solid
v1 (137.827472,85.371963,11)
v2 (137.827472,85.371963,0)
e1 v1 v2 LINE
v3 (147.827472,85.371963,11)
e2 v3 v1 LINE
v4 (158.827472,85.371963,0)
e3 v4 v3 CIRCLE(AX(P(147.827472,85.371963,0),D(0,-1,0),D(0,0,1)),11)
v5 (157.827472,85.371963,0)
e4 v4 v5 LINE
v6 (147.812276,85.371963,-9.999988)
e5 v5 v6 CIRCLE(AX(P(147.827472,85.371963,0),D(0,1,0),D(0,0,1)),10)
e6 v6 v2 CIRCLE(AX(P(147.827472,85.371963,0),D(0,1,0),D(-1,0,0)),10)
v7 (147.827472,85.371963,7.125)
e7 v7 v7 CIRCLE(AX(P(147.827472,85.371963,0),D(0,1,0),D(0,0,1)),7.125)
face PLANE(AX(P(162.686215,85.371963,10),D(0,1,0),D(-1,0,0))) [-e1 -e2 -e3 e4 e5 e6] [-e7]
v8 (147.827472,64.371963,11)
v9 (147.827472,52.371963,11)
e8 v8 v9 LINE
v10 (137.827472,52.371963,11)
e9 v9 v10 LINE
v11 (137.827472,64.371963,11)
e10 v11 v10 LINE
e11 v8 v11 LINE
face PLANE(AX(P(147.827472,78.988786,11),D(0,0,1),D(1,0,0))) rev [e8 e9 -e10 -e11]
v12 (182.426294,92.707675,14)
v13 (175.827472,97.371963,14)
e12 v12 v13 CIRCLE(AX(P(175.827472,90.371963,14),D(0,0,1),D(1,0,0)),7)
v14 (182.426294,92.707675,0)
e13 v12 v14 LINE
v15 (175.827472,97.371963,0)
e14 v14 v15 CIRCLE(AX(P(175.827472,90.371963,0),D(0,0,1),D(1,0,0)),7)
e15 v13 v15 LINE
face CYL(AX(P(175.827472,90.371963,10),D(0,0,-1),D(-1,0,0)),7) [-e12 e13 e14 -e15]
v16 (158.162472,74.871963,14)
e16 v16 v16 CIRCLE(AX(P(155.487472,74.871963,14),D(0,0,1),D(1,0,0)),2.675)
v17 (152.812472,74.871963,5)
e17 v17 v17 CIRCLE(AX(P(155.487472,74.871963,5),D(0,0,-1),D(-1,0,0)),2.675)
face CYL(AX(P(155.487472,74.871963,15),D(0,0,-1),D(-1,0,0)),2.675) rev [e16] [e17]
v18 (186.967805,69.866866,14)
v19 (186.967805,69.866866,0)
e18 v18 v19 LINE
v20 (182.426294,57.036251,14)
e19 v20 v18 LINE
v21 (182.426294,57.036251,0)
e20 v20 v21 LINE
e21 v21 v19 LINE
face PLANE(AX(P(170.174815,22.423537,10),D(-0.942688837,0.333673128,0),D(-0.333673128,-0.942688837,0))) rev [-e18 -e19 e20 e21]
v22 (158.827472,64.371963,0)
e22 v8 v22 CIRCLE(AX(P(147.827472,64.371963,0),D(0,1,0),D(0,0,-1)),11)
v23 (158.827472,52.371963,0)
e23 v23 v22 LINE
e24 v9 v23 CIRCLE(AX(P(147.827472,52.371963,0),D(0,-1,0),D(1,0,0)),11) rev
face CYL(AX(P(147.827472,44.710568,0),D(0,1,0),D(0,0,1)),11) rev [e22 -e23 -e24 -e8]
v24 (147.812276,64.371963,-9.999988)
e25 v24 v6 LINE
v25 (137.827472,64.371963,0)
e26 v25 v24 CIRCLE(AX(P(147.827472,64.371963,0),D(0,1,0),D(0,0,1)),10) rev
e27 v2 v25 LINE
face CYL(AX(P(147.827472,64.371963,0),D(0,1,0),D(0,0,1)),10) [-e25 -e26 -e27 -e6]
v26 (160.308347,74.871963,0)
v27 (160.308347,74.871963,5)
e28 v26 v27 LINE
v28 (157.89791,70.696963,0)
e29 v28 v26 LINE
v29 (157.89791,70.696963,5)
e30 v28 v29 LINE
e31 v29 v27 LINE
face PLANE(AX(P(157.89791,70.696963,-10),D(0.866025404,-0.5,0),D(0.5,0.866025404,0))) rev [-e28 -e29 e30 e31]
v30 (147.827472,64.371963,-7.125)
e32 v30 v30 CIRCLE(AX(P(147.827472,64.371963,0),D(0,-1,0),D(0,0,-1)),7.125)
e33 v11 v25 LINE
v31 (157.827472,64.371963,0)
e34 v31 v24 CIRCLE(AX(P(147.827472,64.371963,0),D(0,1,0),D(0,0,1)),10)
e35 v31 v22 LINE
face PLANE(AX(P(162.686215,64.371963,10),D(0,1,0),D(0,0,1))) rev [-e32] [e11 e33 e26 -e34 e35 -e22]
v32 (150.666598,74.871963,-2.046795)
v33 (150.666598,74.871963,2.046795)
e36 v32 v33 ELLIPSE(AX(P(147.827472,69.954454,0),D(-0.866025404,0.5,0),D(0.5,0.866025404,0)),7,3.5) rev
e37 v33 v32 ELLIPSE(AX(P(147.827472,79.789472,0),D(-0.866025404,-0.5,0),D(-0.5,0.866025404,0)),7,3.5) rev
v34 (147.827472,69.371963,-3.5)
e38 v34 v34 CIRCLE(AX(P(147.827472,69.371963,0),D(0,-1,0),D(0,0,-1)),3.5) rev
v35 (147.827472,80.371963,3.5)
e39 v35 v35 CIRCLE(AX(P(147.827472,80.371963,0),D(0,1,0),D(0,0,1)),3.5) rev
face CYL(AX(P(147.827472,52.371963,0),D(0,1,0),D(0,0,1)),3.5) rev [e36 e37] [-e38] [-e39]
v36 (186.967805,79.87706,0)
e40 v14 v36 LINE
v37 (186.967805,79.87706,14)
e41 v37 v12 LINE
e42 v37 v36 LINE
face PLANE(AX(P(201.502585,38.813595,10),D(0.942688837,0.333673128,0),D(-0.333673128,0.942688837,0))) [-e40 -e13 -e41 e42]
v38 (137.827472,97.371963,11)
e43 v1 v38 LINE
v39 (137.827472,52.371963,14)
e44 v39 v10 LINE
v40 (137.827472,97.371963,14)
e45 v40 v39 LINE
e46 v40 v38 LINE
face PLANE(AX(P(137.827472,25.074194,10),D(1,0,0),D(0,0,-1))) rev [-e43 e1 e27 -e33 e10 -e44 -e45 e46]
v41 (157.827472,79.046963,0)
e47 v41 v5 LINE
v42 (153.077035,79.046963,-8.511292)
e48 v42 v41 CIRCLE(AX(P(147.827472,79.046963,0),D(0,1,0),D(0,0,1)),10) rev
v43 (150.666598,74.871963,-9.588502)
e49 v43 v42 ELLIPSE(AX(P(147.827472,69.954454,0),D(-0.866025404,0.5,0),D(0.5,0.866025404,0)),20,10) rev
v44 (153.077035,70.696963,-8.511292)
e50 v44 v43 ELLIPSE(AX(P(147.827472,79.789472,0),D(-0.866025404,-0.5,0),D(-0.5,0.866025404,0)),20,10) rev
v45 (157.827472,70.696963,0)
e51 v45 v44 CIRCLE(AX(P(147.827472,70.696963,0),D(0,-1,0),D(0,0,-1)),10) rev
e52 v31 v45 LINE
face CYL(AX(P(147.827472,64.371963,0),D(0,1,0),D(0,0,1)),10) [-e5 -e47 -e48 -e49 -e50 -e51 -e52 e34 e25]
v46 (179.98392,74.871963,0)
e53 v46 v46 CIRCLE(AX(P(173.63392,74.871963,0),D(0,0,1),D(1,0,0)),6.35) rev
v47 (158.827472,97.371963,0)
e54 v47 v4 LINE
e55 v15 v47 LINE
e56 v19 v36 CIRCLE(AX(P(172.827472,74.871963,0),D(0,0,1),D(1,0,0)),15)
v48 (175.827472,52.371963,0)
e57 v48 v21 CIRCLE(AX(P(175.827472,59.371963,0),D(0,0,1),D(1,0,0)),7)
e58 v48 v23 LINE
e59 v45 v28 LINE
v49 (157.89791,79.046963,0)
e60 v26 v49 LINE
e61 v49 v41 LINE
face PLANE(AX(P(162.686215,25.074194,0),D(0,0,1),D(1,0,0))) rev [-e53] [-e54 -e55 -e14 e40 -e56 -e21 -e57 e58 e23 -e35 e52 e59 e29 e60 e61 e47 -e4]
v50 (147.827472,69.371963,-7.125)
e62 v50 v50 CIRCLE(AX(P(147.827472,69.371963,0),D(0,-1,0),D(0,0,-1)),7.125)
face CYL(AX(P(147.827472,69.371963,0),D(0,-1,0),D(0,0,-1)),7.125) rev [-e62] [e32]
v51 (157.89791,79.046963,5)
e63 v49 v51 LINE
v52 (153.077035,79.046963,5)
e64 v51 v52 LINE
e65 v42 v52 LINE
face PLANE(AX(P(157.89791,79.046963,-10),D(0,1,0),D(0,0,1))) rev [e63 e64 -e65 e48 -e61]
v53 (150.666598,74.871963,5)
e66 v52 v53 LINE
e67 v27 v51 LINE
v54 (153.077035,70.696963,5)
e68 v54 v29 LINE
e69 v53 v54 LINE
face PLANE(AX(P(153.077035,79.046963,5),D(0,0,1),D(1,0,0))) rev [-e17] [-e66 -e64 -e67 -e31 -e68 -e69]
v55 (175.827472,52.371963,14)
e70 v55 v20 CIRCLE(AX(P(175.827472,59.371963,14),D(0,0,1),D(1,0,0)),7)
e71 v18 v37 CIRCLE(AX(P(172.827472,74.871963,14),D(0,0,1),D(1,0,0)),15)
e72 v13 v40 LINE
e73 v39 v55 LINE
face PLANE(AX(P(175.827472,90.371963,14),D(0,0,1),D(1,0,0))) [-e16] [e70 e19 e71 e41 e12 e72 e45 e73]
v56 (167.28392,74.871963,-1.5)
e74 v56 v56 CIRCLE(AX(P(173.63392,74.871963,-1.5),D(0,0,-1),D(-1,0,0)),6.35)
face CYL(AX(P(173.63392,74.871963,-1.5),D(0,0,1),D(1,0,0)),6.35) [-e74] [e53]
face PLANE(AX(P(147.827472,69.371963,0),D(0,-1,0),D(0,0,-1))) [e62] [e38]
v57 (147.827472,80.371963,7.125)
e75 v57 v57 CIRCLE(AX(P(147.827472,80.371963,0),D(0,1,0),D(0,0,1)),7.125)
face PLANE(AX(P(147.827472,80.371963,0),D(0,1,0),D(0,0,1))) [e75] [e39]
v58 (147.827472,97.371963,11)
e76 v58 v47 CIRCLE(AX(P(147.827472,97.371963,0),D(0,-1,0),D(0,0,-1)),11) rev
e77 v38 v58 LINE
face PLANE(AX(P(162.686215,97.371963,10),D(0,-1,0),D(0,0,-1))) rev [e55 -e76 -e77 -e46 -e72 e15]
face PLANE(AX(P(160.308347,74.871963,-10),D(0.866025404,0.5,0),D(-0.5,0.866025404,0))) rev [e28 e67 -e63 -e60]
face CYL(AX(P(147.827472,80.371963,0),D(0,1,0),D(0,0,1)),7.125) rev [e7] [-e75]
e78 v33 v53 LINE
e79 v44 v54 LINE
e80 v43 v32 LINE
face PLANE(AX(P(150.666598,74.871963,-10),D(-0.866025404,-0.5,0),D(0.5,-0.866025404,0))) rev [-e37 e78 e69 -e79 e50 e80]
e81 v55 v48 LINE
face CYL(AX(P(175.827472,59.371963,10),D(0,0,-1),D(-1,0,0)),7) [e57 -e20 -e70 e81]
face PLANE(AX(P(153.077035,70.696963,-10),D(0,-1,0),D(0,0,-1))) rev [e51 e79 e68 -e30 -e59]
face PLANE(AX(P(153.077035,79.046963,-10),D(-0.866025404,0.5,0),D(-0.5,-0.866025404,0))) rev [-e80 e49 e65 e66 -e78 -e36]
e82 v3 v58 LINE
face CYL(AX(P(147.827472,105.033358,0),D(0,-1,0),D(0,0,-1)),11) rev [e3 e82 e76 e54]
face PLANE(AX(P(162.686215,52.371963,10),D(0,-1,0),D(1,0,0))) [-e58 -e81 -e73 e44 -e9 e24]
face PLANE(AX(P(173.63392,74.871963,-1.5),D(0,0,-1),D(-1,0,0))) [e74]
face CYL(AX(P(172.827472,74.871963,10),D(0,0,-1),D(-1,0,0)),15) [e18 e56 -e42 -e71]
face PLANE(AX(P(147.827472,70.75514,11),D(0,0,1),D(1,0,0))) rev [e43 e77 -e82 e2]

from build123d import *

# Parameters (mm, degrees)
SKETCH1_R            = 2.675
BOSS_EXTRUDE6_DEPTH  = 10
BOSS_EXTRUDE8_START  = -21
BOSS_EXTRUDE8_DEPTH  = 21
SKETCH10_R           = 3.5
CUT_EXTRUDE5_DEPTH   = 191.966382811
SKETCH11_R           = 7.125
CUT_EXTRUDE6_DEPTH   = 5
CUT_EXTRUDE7_START   = -5
SKETCH12_R           = 7.125
CUT_EXTRUDE7_DEPTH   = 5
BOSS_EXTRUDE9_DEPTH  = 5
BOSS_EXTRUDE11_DEPTH = 12
BOSS_EXTRUDE13_START = 12
BOSS_EXTRUDE13_DEPTH = 12
SKETCH18_R           = 6.75
CUT_EXTRUDE11_DEPTH  = 1.67
CUT_EXTRUDE13_DEPTH  = 191.966382811
CUT_EXTRUDE14_DEPTH  = 191.966382811
CUT_EXTRUDE10_DEPTH  = 213.509902322
SKETCH26_R           = 2.675
BOSS_EXTRUDE14_DEPTH = 5
SKETCH27_R           = 2.675
BOSS_EXTRUDE15_DEPTH = 5
SKETCH30_R           = 2.675
CUT_EXTRUDE15_DEPTH  = 10
BOSS_EXTRUDE16_START = 1.67
SKETCH31_R           = 6.75
BOSS_EXTRUDE16_DEPTH = 1.67
SKETCH32_R           = 6.75
BOSS_EXTRUDE17_DEPTH = 2
SKETCH34_R           = 6.35
BOSS_EXTRUDE18_DEPTH = 1.5
SKETCH35_R           = 2.675
BOSS_EXTRUDE19_DEPTH = 4
CUT_EXTRUDE16_DEPTH  = 12
CUT_EXTRUDE17_DEPTH  = 12
FILLET1_R            = 10


with BuildPart() as part:
    # Sketch1 → Boss-Extrude6 (new body)
    with BuildSketch(Plane.XY):
        with BuildLine():
            Line((182.426294195, 92.707675116), (186.967804891, 79.877060143))
            ThreePointArc((186.967804891, 79.877060143), (187.827472336, 74.871963218), (186.967804891, 69.866866293))
            Line((186.967804891, 69.866866293), (182.426294195, 57.03625132))
            ThreePointArc((182.426294195, 57.03625132), (179.86789414, 53.655758914), (175.827472336, 52.371963218))
            Line((175.827472336, 52.371963218), (157.827472336, 52.371963218))
            Line((157.827472336, 52.371963218), (157.827472336, 64.371963218))
            Line((157.827472336, 64.371963218), (137.827472336, 64.371963218))
            Line((137.827472336, 64.371963218), (137.827472336, 85.371963218))
            Line((137.827472336, 85.371963218), (157.827472336, 85.371963218))
            Line((157.827472336, 85.371963218), (157.827472336, 97.371963218))
            Line((157.827472336, 97.371963218), (175.827472336, 97.371963218))
            ThreePointArc((175.827472336, 97.371963218), (179.86789414, 96.088167522), (182.426294195, 92.707675116))
        make_face()
        with Locations((155.487472336, 74.871963218)):
            Circle(SKETCH1_R, mode=Mode.SUBTRACT)
    extrude(amount=BOSS_EXTRUDE6_DEPTH)

    # Sketch9 → Boss-Extrude8 (add)
    with BuildSketch(Plane(origin=(0, 85.371963218, 0), x_dir=(1, 0, 0), z_dir=(0, 1, 0)).offset(BOSS_EXTRUDE8_START)):
        with BuildLine():
            Line((137.827472336, 0), (157.827472336, 0))
            ThreePointArc((157.827472336, 0), (154.893165251, 7.076438626), (147.81227561, 9.999988453))
            Line((147.81227561, 9.999988453), (137.827472336, 9.999988453))
            Line((137.827472336, 9.999988453), (137.827472336, 0))
        make_face()
    extrude(amount=BOSS_EXTRUDE8_DEPTH)

    # Sketch10 → Cut-Extrude5 (cut, through all)
    with BuildSketch(Plane(origin=(0, 85.371963218, 0), x_dir=(1, 0, 0), z_dir=(0, 1, 0))):
        with Locations(Location((147.827472336, 0, 0), (0, 0, 270))):
            Circle(SKETCH10_R)
    extrude(amount=-CUT_EXTRUDE5_DEPTH, mode=Mode.SUBTRACT)

    # Sketch11 → Cut-Extrude6 (cut)
    with BuildSketch(Plane(origin=(0, 85.371963218, 0), x_dir=(1, 0, 0), z_dir=(0, 1, 0))):
        with Locations(Location((147.827472336, 0, 0), (0, 0, 270))):
            Circle(SKETCH11_R)
    extrude(amount=-CUT_EXTRUDE6_DEPTH, mode=Mode.SUBTRACT)

    # Sketch12 → Cut-Extrude7 (cut)
    with BuildSketch(Plane.XZ.offset(-64.371963218).offset(CUT_EXTRUDE7_START)):
        with Locations(Location((147.827472336, 0, 0), (0, 0, 90))):
            Circle(SKETCH12_R)
    extrude(amount=CUT_EXTRUDE7_DEPTH, mode=Mode.SUBTRACT)

    # Sketch15 → Boss-Extrude9 (add)
    with BuildSketch(Plane.XY.offset(10)):
        Polygon((157.89790971, 79.046963218), (153.077034962, 79.046963218), (150.666597588, 74.871963218), (153.077034962, 70.696963218), (157.89790971, 70.696963218), (160.308347084, 74.871963218), align=None)
    extrude(amount=-BOSS_EXTRUDE9_DEPTH)

    # Sketch19 → Boss-Extrude11 (add)
    with BuildSketch(Plane(origin=(0, 85.371963218, 0), x_dir=(1, 0, 0), z_dir=(0, 1, 0))):
        with BuildLine():
            Line((157.827472336, -4.582575695), (157.827472336, -10))
            Line((157.827472336, -10), (152.410048031, -10))
            ThreePointArc((152.410048031, -10), (155.605646929, -7.778174593), (157.827472336, -4.582575695))
        make_face()
    extrude(amount=BOSS_EXTRUDE11_DEPTH)

    # Sketch21 → Boss-Extrude13 (add)
    with BuildSketch(Plane.XZ.offset(-64.371963218).offset(BOSS_EXTRUDE13_START)):
        with BuildLine():
            Line((157.827472336, 4.582575695), (157.827472336, 10))
            Line((157.827472336, 10), (152.410048031, 10))
            ThreePointArc((152.410048031, 10), (155.605646929, 7.778174593), (157.827472336, 4.582575695))
        make_face()
    extrude(amount=-BOSS_EXTRUDE13_DEPTH)

    # Sketch18 → Cut-Extrude11 (cut)
    with BuildSketch(Plane(origin=(0, 0, 0), x_dir=(-1, 0, 0), z_dir=(0, 0, -1))):
        with Locations((-173.633919606, 74.871963218)):
            Circle(SKETCH18_R)
    extrude(amount=-CUT_EXTRUDE11_DEPTH, mode=Mode.SUBTRACT)

    # Sketch23 → Cut-Extrude13 (cut, through all)
    with BuildSketch(Plane.XZ.offset(-64.371963218)):
        with BuildLine():
            Line((157.827472336, 4.582575695), (157.827472336, 0))
            Line((157.827472336, 0), (158.827472336, 0))
            ThreePointArc((158.827472336, 0), (158.574564966, 2.34520788), (157.827472336, 4.582575695))
        make_face()
    extrude(amount=CUT_EXTRUDE13_DEPTH, mode=Mode.SUBTRACT)

    # Sketch24 → Cut-Extrude14 (cut, through all)
    with BuildSketch(Plane(origin=(0, 85.371963218, 0), x_dir=(1, 0, 0), z_dir=(0, 1, 0))):
        with BuildLine():
            Line((157.827472336, -4.582575695), (157.827472336, 0))
            Line((157.827472336, 0), (158.827472336, 0))
            ThreePointArc((158.827472336, 0), (158.574564966, -2.34520788), (157.827472336, -4.582575695))
        make_face()
    extrude(amount=CUT_EXTRUDE14_DEPTH, mode=Mode.SUBTRACT)

    # Sketch14 → Cut-Extrude10 (cut, through all)
    with BuildSketch(Plane.XY.offset(10)):
        Polygon((157.89790971, 79.046963218), (153.077034962, 79.046963218), (150.666597588, 74.871963218), (153.077034962, 70.696963218), (157.89790971, 70.696963218), (160.308347084, 74.871963218), align=None)
    extrude(amount=-CUT_EXTRUDE10_DEPTH, mode=Mode.SUBTRACT)

    # Sketch26 → Boss-Extrude14 (add)
    with BuildSketch(Plane.XY.offset(10)):
        Polygon((153.077034962, 79.046963218), (150.666597588, 74.871963218), (153.077034962, 70.696963218), (157.89790971, 70.696963218), (160.308347084, 74.871963218), (157.89790971, 79.046963218), align=None)
        with Locations((155.487472336, 74.871963218)):
            Circle(SKETCH26_R, mode=Mode.SUBTRACT)
    extrude(amount=-BOSS_EXTRUDE14_DEPTH)

    # Sketch27 → Boss-Extrude15 (add)
    with BuildSketch(Plane.XY.offset(10)):
        with Locations((155.487472336, 74.871963218)):
            Circle(SKETCH27_R)
    extrude(amount=-BOSS_EXTRUDE15_DEPTH)

    # Sketch30 → Cut-Extrude15 (cut)
    with BuildSketch(Plane(origin=(0, 0, 5), x_dir=(-1, 0, 0), z_dir=(0, 0, -1))):
        with Locations((-155.487472336, 74.871963218)):
            Circle(SKETCH30_R)
    extrude(amount=-CUT_EXTRUDE15_DEPTH, mode=Mode.SUBTRACT)

    # Sketch31 → Boss-Extrude16 (add)
    with BuildSketch(Plane(origin=(0, 0, 1.67), x_dir=(-1, 0, 0), z_dir=(0, 0, -1)).offset(BOSS_EXTRUDE16_START)):
        with BuildLine():
            Line((-157.827472336, 85.371963218), (-158.827472336, 85.371963218))
            Line((-158.827472336, 85.371963218), (-158.827472336, 97.371963218))
            Line((-158.827472336, 97.371963218), (-175.827472336, 97.371963218))
            ThreePointArc((-175.827472336, 97.371963218), (-179.86789414, 96.088167522), (-182.426294195, 92.707675116))
            Line((-182.426294195, 92.707675116), (-186.967804891, 79.877060143))
            ThreePointArc((-186.967804891, 79.877060143), (-187.827472336, 74.871963218), (-186.967804891, 69.866866293))
            Line((-186.967804891, 69.866866293), (-182.426294195, 57.03625132))
            ThreePointArc((-182.426294195, 57.03625132), (-179.86789414, 53.655758914), (-175.827472336, 52.371963218))
            Line((-175.827472336, 52.371963218), (-158.827472336, 52.371963218))
            Line((-158.827472336, 52.371963218), (-158.827472336, 64.371963218))
            Line((-158.827472336, 64.371963218), (-157.827472336, 64.371963218))
            Line((-157.827472336, 64.371963218), (-157.827472336, 70.696963218))
            Line((-157.827472336, 70.696963218), (-157.89790971, 70.696963218))
            Line((-157.89790971, 70.696963218), (-160.308347084, 74.871963218))
            Line((-160.308347084, 74.871963218), (-157.89790971, 79.046963218))
            Line((-157.89790971, 79.046963218), (-157.827472336, 79.046963218))
            Line((-157.827472336, 79.046963218), (-157.827472336, 85.371963218))
        make_face()
        with Locations((-173.633919606, 74.871963218)):
            Circle(SKETCH31_R, mode=Mode.SUBTRACT)
    extrude(amount=-BOSS_EXTRUDE16_DEPTH)

    # Sketch32 → Boss-Extrude17 (add)
    with BuildSketch(Plane(origin=(0, 0, 0), x_dir=(-1, 0, 0), z_dir=(0, 0, -1))):
        with Locations((-173.633919606, 74.871963218)):
            Circle(SKETCH32_R)
    extrude(amount=-BOSS_EXTRUDE17_DEPTH)

    # Sketch34 → Boss-Extrude18 (add)
    with BuildSketch(Plane(origin=(0, 0, 0), x_dir=(-1, 0, 0), z_dir=(0, 0, -1))):
        with Locations(Location((-173.633919606, 74.871963218, 0), (0, 0, 180))):
            Circle(SKETCH34_R)
    extrude(amount=BOSS_EXTRUDE18_DEPTH)

    # Sketch35 → Boss-Extrude19 (add)
    with BuildSketch(Plane.XY.offset(10)):
        with BuildLine():
            Line((137.827472336, 85.371963218), (137.827472336, 64.371963218))
            Line((137.827472336, 64.371963218), (137.827472336, 52.371963218))
            Line((137.827472336, 52.371963218), (175.827472336, 52.371963218))
            ThreePointArc((175.827472336, 52.371963218), (179.86789414, 53.655758914), (182.426294195, 57.03625132))
            Line((182.426294195, 57.03625132), (186.967804891, 69.866866293))
            ThreePointArc((186.967804891, 69.866866293), (187.827472336, 74.871963218), (186.967804891, 79.877060143))
            Line((186.967804891, 79.877060143), (182.426294195, 92.707675116))
            ThreePointArc((182.426294195, 92.707675116), (179.86789414, 96.088167522), (175.827472336, 97.371963218))
            Line((175.827472336, 97.371963218), (137.827472336, 97.371963218))
            Line((137.827472336, 97.371963218), (137.827472336, 85.371963218))
        make_face()
        with Locations(Location((155.487472336, 74.871963218, 0), (0, 0, 180))):
            Circle(SKETCH35_R, mode=Mode.SUBTRACT)
    extrude(amount=BOSS_EXTRUDE19_DEPTH)

    # Sketch36 → Cut-Extrude16 (cut)
    with BuildSketch(Plane(origin=(0, 97.371963218, 0), x_dir=(1, 0, 0), z_dir=(0, 1, 0))):
        with BuildLine():
            Line((147.827472336, -11), (137.827472336, -11))
            Line((137.827472336, -11), (137.827472336, -10))
            Line((137.827472336, -10), (152.410048031, -10))
            ThreePointArc((152.410048031, -10), (150.172680216, -10.74709263), (147.827472336, -11))
        make_face()
    extrude(amount=-CUT_EXTRUDE16_DEPTH, mode=Mode.SUBTRACT)

    # Sketch38 → Cut-Extrude17 (cut)
    with BuildSketch(Plane.XZ.offset(-52.371963218)):
        with BuildLine():
            Line((147.827472336, 11), (137.827472336, 11))
            Line((137.827472336, 11), (137.827472336, 10))
            Line((137.827472336, 10), (152.410048031, 10))
            ThreePointArc((152.410048031, 10), (150.172680216, 10.74709263), (147.827472336, 11))
        make_face()
    extrude(amount=-CUT_EXTRUDE17_DEPTH, mode=Mode.SUBTRACT)

    # Fillet1
    # the kernel refuses this fillet: 10 mm, written as the material it takes off along each edge
    with BuildSketch(Plane(origin=(137.827472336, 39.371963218, -9.999988453), x_dir=(0.9999999999993333, 0, -1.1547030050344039e-06), z_dir=(0, 1, 0))) as fillet1_piece_1:
        with BuildLine():
            CenterArc((9.999988453, -10), FILLET1_R, 89.99993384, 90)
            Line((-1.1547e-05, -9.999988453), (-1.000011547, -9.999987298))
            Line((-1.000011547, -9.999987298), (-1, 1.155e-06))
            Line((-1, 1.155e-06), (1.155e-06, 1))
            ThreePointArc((1.155e-06, 1), (9.983284757, 0.999987318), (10.000001155, 1))
            Line((10.000001155, 1), (10, 0))
        make_face()
    extrude(amount=71, mode=Mode.SUBTRACT)


solid = part.part
